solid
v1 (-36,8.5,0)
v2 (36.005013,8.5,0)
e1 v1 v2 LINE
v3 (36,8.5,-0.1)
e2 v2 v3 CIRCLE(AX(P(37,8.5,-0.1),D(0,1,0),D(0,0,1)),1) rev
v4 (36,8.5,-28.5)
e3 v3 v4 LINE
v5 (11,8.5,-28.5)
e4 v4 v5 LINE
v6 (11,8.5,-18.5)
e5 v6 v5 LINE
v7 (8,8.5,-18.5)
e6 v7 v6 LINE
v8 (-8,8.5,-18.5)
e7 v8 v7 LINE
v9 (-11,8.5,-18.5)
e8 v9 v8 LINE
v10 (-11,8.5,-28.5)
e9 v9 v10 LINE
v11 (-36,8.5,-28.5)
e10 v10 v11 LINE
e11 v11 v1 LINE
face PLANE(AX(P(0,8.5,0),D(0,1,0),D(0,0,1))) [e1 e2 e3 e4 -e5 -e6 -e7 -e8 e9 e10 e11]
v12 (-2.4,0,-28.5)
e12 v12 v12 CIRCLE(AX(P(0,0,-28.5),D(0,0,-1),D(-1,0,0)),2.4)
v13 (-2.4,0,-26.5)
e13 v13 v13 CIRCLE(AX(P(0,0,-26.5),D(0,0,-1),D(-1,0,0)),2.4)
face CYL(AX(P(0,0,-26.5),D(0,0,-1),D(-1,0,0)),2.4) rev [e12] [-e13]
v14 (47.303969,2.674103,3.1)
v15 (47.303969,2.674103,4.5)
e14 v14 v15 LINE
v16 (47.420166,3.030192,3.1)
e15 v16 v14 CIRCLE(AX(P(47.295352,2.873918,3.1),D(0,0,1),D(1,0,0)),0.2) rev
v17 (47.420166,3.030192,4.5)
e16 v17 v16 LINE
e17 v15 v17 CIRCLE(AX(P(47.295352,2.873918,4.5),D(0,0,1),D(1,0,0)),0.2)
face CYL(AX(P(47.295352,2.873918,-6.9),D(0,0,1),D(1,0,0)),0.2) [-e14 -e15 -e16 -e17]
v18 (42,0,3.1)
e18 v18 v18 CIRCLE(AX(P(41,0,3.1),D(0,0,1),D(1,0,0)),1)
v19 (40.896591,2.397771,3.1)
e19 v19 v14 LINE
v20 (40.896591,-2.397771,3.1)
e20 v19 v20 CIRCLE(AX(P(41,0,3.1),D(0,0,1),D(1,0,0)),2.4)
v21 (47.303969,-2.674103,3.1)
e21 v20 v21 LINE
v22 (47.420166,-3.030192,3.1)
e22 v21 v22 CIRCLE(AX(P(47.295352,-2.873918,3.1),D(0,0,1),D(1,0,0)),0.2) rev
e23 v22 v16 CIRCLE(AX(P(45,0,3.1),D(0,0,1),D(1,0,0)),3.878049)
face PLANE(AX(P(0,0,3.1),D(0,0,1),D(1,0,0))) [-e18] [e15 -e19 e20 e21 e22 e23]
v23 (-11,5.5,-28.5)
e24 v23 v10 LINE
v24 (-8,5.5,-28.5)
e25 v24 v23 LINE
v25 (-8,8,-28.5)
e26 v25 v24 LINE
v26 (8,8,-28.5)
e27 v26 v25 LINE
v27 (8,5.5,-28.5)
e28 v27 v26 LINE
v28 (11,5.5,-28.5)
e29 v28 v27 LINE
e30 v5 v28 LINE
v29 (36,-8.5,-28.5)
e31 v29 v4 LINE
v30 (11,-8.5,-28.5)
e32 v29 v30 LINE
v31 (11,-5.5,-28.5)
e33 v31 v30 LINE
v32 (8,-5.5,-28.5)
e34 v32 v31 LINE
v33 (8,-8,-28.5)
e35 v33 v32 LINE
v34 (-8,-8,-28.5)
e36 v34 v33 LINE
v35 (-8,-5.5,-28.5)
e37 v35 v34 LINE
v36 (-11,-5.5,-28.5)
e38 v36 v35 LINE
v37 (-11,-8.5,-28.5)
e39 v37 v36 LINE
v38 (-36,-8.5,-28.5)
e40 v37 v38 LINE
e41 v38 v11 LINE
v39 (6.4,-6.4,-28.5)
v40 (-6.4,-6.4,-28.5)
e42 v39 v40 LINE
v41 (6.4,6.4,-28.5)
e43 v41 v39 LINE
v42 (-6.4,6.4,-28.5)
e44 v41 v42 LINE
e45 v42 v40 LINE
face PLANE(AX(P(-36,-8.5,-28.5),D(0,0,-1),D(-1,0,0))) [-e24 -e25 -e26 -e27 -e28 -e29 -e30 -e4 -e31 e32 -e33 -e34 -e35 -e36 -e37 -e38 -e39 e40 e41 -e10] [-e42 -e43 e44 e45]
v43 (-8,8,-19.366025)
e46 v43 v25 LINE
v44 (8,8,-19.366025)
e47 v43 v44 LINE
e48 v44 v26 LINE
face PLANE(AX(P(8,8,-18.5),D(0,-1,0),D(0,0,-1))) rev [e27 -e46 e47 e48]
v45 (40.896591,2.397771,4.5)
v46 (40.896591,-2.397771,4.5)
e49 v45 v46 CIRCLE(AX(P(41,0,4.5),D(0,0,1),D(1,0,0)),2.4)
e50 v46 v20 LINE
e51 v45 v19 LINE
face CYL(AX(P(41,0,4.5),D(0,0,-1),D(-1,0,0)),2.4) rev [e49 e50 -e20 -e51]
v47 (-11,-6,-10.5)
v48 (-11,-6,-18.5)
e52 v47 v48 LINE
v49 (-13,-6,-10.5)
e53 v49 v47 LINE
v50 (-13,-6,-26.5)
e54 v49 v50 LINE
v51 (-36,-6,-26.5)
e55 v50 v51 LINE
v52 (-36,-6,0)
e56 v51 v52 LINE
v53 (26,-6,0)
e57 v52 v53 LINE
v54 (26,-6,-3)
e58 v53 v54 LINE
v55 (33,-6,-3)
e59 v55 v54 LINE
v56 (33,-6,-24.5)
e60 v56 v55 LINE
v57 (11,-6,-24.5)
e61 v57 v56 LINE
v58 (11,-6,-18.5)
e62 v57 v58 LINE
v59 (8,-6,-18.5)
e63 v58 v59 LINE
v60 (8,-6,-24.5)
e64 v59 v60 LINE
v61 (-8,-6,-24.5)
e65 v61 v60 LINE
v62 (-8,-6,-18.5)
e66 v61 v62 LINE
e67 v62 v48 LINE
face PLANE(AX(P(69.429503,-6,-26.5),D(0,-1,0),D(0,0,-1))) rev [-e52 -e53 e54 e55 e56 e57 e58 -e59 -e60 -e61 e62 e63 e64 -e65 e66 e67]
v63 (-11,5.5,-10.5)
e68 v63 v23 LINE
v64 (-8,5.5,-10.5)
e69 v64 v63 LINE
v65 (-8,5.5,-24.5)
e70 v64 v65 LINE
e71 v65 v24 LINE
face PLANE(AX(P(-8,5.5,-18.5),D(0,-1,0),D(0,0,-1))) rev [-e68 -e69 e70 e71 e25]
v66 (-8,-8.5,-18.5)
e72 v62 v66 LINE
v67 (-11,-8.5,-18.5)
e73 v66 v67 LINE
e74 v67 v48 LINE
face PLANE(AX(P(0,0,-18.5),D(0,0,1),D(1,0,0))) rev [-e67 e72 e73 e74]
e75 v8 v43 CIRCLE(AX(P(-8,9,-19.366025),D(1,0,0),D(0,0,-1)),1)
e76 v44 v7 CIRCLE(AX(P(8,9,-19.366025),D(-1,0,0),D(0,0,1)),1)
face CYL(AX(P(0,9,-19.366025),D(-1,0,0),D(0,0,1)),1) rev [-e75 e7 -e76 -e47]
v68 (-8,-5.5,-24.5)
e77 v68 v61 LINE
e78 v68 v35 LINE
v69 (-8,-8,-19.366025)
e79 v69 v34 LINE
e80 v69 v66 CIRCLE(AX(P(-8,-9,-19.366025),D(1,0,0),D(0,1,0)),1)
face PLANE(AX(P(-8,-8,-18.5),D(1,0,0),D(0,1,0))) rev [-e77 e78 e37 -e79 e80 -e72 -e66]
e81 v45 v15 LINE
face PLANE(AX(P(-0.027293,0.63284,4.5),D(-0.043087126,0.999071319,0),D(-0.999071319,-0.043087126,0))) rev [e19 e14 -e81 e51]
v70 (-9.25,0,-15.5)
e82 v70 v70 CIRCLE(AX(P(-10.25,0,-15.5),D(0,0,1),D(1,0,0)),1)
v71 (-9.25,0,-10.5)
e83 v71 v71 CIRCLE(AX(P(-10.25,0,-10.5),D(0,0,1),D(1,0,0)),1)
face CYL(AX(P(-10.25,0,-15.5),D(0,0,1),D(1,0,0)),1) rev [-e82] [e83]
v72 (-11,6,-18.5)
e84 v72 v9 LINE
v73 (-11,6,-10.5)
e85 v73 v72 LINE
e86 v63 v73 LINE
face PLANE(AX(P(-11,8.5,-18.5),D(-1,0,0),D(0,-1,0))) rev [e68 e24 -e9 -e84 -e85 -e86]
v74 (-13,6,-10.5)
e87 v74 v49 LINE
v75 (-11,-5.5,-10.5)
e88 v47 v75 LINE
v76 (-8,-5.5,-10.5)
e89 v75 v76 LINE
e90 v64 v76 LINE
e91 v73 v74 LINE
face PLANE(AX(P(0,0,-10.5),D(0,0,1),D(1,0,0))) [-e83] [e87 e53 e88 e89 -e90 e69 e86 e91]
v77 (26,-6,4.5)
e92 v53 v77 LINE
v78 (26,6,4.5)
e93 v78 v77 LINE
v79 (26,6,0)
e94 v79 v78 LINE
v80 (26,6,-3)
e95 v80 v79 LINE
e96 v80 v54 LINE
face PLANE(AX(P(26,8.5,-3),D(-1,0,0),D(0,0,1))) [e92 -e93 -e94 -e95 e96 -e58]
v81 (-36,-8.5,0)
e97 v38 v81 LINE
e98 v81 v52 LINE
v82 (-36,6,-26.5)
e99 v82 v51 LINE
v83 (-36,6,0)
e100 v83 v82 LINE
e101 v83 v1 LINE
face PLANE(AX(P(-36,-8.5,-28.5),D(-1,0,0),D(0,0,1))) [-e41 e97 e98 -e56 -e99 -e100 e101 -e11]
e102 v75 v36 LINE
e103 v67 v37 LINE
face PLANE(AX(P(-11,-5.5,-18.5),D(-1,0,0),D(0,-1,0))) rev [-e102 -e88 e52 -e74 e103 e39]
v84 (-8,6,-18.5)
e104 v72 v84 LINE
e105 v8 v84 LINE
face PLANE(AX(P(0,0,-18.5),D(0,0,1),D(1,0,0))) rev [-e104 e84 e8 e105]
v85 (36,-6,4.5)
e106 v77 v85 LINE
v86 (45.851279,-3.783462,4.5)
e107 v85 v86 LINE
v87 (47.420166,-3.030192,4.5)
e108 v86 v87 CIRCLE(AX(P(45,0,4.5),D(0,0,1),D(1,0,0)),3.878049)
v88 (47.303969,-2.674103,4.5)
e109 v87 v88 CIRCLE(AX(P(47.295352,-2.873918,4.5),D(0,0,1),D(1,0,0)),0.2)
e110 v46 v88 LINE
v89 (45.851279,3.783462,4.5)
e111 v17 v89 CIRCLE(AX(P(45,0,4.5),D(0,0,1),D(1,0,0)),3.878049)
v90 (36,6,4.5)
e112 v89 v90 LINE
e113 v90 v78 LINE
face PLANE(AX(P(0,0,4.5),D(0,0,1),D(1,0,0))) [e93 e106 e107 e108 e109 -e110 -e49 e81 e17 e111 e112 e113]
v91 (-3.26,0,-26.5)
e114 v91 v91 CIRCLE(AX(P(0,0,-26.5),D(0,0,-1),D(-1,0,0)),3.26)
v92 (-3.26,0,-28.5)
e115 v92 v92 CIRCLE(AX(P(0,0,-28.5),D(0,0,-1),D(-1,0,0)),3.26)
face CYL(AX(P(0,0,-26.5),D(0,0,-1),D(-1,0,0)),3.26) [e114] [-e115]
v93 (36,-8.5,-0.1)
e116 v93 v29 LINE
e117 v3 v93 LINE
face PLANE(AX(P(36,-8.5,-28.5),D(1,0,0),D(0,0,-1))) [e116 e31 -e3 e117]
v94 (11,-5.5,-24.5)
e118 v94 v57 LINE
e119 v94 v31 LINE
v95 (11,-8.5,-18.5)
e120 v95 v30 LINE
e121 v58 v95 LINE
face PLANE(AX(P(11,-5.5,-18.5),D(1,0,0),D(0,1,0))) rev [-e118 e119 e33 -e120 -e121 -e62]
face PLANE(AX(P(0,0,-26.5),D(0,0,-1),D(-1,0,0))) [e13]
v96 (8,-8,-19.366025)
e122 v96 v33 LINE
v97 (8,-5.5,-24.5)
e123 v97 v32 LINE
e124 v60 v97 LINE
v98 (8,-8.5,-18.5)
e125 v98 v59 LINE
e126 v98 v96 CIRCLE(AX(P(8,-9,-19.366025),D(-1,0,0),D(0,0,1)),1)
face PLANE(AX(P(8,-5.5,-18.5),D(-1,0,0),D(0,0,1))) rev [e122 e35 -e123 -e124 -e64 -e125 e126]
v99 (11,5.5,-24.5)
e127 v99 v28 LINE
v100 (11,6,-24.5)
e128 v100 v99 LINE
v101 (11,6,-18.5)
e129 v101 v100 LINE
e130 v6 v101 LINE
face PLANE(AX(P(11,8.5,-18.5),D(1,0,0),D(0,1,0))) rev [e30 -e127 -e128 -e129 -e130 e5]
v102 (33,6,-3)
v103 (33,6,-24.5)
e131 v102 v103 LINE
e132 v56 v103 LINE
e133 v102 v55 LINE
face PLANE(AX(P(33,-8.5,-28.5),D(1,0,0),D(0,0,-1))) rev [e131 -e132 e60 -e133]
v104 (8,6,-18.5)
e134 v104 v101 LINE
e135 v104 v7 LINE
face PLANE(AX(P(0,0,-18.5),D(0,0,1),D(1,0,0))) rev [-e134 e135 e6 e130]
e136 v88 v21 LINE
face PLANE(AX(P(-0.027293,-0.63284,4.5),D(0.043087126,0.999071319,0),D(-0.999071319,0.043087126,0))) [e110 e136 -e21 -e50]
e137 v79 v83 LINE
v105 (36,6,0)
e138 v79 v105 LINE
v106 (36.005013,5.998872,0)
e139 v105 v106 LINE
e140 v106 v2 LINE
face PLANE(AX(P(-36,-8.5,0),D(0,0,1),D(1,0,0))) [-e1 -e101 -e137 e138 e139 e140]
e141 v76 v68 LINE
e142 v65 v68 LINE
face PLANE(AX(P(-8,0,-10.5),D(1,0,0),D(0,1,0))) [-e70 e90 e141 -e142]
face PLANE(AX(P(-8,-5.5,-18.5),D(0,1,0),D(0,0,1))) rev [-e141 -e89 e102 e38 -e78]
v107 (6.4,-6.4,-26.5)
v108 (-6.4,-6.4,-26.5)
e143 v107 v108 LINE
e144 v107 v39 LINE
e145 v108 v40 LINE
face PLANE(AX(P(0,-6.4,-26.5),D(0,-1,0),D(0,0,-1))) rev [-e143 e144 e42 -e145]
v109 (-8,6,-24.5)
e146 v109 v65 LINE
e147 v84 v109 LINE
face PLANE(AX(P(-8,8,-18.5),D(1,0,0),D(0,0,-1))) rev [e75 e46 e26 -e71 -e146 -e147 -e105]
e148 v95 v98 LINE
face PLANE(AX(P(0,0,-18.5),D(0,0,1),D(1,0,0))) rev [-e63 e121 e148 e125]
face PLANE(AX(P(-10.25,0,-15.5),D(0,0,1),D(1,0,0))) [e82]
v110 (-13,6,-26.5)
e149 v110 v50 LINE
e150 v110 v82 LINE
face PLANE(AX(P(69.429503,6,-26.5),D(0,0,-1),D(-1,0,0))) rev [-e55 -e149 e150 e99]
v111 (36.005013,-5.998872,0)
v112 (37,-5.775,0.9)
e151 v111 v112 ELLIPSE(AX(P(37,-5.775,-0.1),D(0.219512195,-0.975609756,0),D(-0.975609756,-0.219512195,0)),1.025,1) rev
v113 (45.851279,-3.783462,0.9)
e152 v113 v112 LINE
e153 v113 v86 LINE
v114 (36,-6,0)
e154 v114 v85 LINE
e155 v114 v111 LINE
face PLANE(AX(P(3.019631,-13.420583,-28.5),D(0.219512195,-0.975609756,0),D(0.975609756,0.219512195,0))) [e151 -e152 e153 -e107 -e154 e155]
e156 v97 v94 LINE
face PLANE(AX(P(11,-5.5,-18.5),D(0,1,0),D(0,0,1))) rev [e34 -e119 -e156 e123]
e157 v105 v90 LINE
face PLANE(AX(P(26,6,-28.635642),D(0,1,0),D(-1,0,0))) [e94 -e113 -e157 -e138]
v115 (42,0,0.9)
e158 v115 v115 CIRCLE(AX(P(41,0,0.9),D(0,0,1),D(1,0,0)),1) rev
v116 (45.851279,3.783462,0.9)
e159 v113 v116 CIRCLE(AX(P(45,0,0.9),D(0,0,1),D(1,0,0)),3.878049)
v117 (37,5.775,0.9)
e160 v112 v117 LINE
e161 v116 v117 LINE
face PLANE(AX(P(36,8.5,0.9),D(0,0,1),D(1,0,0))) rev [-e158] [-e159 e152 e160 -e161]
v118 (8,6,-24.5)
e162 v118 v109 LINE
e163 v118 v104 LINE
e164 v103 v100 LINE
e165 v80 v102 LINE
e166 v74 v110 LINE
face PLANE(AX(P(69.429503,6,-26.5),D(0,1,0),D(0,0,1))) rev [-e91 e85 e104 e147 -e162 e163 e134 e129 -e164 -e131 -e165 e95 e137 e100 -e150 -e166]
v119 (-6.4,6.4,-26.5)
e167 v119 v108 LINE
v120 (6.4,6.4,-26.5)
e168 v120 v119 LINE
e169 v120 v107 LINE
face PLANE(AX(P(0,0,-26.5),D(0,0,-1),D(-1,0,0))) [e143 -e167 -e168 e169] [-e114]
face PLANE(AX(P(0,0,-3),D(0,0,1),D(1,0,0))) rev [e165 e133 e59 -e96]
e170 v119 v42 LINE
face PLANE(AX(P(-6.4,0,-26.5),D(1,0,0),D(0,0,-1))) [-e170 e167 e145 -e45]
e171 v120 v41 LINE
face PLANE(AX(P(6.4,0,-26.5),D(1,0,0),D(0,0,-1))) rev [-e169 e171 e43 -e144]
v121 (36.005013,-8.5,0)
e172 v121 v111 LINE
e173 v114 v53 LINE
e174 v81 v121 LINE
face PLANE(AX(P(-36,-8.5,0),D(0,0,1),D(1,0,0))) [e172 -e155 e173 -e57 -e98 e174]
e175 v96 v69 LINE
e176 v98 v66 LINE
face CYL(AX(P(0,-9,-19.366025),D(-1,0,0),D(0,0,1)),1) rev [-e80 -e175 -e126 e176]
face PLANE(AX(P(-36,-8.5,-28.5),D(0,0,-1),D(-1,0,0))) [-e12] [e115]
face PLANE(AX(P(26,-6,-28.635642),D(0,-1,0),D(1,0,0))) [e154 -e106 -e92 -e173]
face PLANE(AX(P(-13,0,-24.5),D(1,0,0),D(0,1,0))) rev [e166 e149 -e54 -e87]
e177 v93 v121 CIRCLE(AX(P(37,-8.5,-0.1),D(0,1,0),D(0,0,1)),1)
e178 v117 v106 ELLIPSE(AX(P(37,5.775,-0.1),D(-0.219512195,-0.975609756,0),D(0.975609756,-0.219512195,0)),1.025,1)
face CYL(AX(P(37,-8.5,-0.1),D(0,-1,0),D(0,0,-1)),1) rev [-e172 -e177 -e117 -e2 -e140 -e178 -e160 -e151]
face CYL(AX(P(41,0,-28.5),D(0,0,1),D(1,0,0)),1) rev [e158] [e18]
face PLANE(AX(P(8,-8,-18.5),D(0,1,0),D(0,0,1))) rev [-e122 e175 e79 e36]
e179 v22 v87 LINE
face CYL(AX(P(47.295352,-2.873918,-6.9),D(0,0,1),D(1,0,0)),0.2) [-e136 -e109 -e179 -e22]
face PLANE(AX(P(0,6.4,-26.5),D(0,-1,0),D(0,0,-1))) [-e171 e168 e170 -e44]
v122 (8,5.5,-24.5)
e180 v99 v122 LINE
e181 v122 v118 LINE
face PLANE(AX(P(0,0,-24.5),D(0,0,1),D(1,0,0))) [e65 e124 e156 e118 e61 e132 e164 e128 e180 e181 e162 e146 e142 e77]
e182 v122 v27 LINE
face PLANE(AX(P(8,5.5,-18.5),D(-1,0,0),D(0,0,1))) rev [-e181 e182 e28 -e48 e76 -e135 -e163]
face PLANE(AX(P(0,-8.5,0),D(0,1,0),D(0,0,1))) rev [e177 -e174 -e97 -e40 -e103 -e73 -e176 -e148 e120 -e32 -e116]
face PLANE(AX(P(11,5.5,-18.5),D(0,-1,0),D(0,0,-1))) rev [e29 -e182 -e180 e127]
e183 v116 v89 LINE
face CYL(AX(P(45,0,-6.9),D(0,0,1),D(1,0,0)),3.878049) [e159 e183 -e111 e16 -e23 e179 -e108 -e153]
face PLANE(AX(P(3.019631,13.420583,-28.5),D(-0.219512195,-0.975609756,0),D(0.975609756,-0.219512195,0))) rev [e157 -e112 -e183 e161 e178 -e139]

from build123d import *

# Parameters (mm, degrees)
BOSS_EXTRUDE1_DEPTH      = 8.5
BOSS_EXTRUDE1_DEPTH_BACK = 8.5
SKETCH1_W                = 72
SKETCH1_H                = 28.5
SKETCH2_W                = 31.201469113
SKETCH2_H                = 12
CUT_EXTRUDE1_DEPTH       = 69
SKETCH3_W                = 10
SKETCH3_H                = 17
BOSS_EXTRUDE2_DEPTH      = 3
CUT_EXTRUDE2_DEPTH       = 10
FILLET1_R                = 1
BOSS_EXTRUDE3_DEPTH      = 2
SKETCH8_W                = 12.8
SKETCH8_H                = 12.8
SKETCH8_R                = 3.26
SKETCH8_R_2              = 2.4
CUT_EXTRUDE3_DEPTH       = 2
SKETCH11_W               = 26
SKETCH11_H               = 12
BOSS_EXTRUDE7_DEPTH      = 3.1
SKETCH14_R               = 1
CUT_EXTRUDE4_DEPTH       = 62.43948242
CUT_EXTRUDE6_DEPTH       = 62.43948242
CUT_EXTRUDE7_DEPTH       = 62.43948242
BOSS_EXTRUDE8_DEPTH      = 14
SKETCH19_R               = 1
CUT_EXTRUDE8_DEPTH       = 5
SKETCH20_W               = 17.87603411
SKETCH20_H               = 5.867107887
CUT_EXTRUDE9_DEPTH       = 62.686708455
FILLET4_R                = 1
CUT_EXTRUDE10_DEPTH      = 10
BOSS_EXTRUDE9_START      = 1.4
BOSS_EXTRUDE9_DEPTH      = 1.4
FILLET5_R                = 0.2


with BuildPart() as part:
    # Sketch1 → Boss-Extrude1 (new, two sides: drawn at the far end of the back side and taken through both)
    with BuildSketch(Plane(origin=(0, 0, 0), x_dir=(1, 0, 0), z_dir=(0, 1, 0)).offset(-BOSS_EXTRUDE1_DEPTH_BACK)):
        with Locations((0, 14.25)):
            Rectangle(SKETCH1_W, SKETCH1_H)
    extrude(amount=BOSS_EXTRUDE1_DEPTH + BOSS_EXTRUDE1_DEPTH_BACK)

    # Sketch2 → Cut-Extrude1 (cut)
    with BuildSketch(Plane.ZY.offset(36)):
        with Locations((-10.899265443, 0)):
            Rectangle(SKETCH2_W, SKETCH2_H)
    extrude(amount=-CUT_EXTRUDE1_DEPTH, mode=Mode.SUBTRACT)

    # Sketch3 → Boss-Extrude2 (add)
    with BuildSketch(Plane.XY):
        with Locations((31, 0)):
            Rectangle(SKETCH3_W, SKETCH3_H)
    extrude(amount=-BOSS_EXTRUDE2_DEPTH)

    # Sketch6 → Cut-Extrude2 (cut)
    with BuildSketch(Plane(origin=(0, 0, -28.5), x_dir=(-1, 0, 0), z_dir=(0, 0, -1))):
        Polygon((-11, 8.5), (-11, 5.5), (-8, 5.5), (-8, 8), (8, 8), (8, 5.5), (11, 5.5), (11, 8.5), align=None)
        Polygon((-11, -5.5), (-11, -8.5), (11, -8.5), (11, -5.5), (8, -5.5), (8, -8), (-8, -8), (-8, -5.5), align=None)
    extrude(amount=-CUT_EXTRUDE2_DEPTH, mode=Mode.SUBTRACT)

    # Fillet1
    # the kernel refuses this fillet: 1 mm, written as the material it adds along each edge
    with BuildSketch(Plane(origin=(-8, -8, -18.5), x_dir=(0, 0, -1), z_dir=(1, 0, 0)), Plane(origin=(8, 8, -18.5), x_dir=(0, 0, -1), z_dir=(-1, 0, 0))) as fillet1_piece_1:
        with BuildLine():
            CenterArc((0.866025404, -1), FILLET1_R, 90, 60)
            Line((0, -0.5), (-0.017320508, -0.49))
            ThreePointArc((-0.017320508, -0.49), (-0.02, -0.25), (-0.02, 0))
            Line((-0.02, 0), (0, 0.02))
            Line((0, 0.02), (0.866025404, 0.02))
            Line((0.866025404, 0.02), (0.866025404, 0))
        make_face()
    extrude(amount=16)

    # Sketch7 → Boss-Extrude3 (add)
    with BuildSketch(Plane.XY.offset(-26.5)):
        Polygon((33, -6), (33, 6), (11, 6), (11, 5.5), (8, 5.5), (8, 6), (-8, 6), (-8, 5.5), (-11, 5.5), (-11, 6), (-13, 6), (-13, -6), (-11, -6), (-11, -5.5), (-8, -5.5), (-8, -6), (8, -6), (8, -5.5), (11, -5.5), (11, -6), align=None)
    extrude(amount=BOSS_EXTRUDE3_DEPTH)

    # Sketch8 → Cut-Extrude3 (cut)
    # profile 1 of 2: a face of its own
    with BuildSketch(Plane(origin=(0, 0, -28.5), x_dir=(-1, 0, 0), z_dir=(0, 0, -1))):
        Rectangle(SKETCH8_W, SKETCH8_H)
        Circle(SKETCH8_R, mode=Mode.SUBTRACT)
    # profile 2 of 2: a face of its own
    with BuildSketch(Plane(origin=(0, 0, -28.5), x_dir=(-1, 0, 0), z_dir=(0, 0, -1))):
        Circle(SKETCH8_R_2)
    extrude(amount=-CUT_EXTRUDE3_DEPTH, mode=Mode.SUBTRACT)

    # Sketch11 → Boss-Extrude7 (add)
    with BuildSketch(Plane.XY.offset(3.1)):
        with Locations((39, 0)):
            Rectangle(SKETCH11_W, SKETCH11_H)
    extrude(amount=-BOSS_EXTRUDE7_DEPTH)

    # Sketch14 → Cut-Extrude4 (cut, through all)
    with BuildSketch(Plane.XY.offset(3.1)):
        with Locations((41, 0)):
            Circle(SKETCH14_R)
    extrude(amount=-CUT_EXTRUDE4_DEPTH, mode=Mode.SUBTRACT)

    # Sketch15 → Cut-Extrude6 (cut, through all)
    with BuildSketch(Plane.XY.offset(3.1)):
        with BuildLine():
            Line((52, 6), (36, 6))
            Line((36, 6), (49.658536622, 2.92682926))
            ThreePointArc((49.658536622, 2.92682926), (51.34260644, 1.874085128), (52, 0))
            Line((52, 0), (52, 6))
        make_face()
    extrude(amount=-CUT_EXTRUDE6_DEPTH, mode=Mode.SUBTRACT)

    # Sketch17 → Cut-Extrude7 (cut, through all)
    with BuildSketch(Plane.XY.offset(3.1)):
        with BuildLine():
            Line((36, -6), (52, -6))
            Line((52, -6), (52, 0))
            ThreePointArc((52, 0), (51.342606414, -1.874085161), (49.658536541, -2.926829278))
            Line((49.658536541, -2.926829278), (36, -6))
        make_face()
    extrude(amount=-CUT_EXTRUDE7_DEPTH, mode=Mode.SUBTRACT)

    # Sketch18 → Boss-Extrude8 (add)
    with BuildSketch(Plane.XY.offset(-24.5)):
        Polygon((-11, 6), (-13, 6), (-13, -6), (-11, -6), (-11, -5.5), (-8, -5.5), (-8, 5.5), (-11, 5.5), align=None)
    extrude(amount=BOSS_EXTRUDE8_DEPTH)

    # Sketch19 → Cut-Extrude8 (cut)
    with BuildSketch(Plane.XY.offset(-10.5)):
        with Locations((-10.25, 0)):
            Circle(SKETCH19_R)
    extrude(amount=-CUT_EXTRUDE8_DEPTH, mode=Mode.SUBTRACT)

    # Sketch20 → Cut-Extrude9 (cut, through all)
    with BuildSketch(Plane.XZ.offset(8.5)):
        with Locations((44.938017055, -2.033553943)):
            Rectangle(SKETCH20_W, SKETCH20_H)
    extrude(amount=-CUT_EXTRUDE9_DEPTH, mode=Mode.SUBTRACT)

    # Fillet4
    # the kernel refuses this fillet: 1 mm, written as the material it adds along each edge
    with BuildSketch(Plane(origin=(36, -8.5, 0.9), x_dir=(1, 0, 0), z_dir=(0, 1, 0))) as fillet4_piece_1_section:
        with BuildLine():
            CenterArc((FILLET4_R, FILLET4_R), FILLET4_R, 180, 90)
            Line((0, FILLET4_R), (0, 0))
            Line((0, 0), (FILLET4_R, 0))
        make_face()
    fillet4_piece_1 = extrude(amount=14.5, mode=Mode.PRIVATE)
    fillet4_piece_1 = split(fillet4_piece_1, bisect_by=Plane(origin=(35.990889593, -7.251037957, 0), z_dir=(0, 0, -1)), keep=Keep.TOP, mode=Mode.PRIVATE)
    fillet4_piece_1 = split(fillet4_piece_1, bisect_by=Plane(origin=(35.723408497, -6.062233088, -0.048071683), z_dir=(0.21951219512195128, -0.9756097560975611, 0)), keep=Keep.TOP, mode=Mode.PRIVATE)
    fillet4_piece_1 = split(fillet4_piece_1, bisect_by=Plane(origin=(35.990889593, -6, -0.048071683), z_dir=(0, -1, 0)), keep=Keep.TOP, mode=Mode.PRIVATE)
    add(fillet4_piece_1)
    with BuildSketch(Plane(origin=(36, -6, 0.9), x_dir=(1, 0, 0), z_dir=(0, 1, 0))) as fillet4_piece_2_section:
        with BuildLine():
            CenterArc((FILLET4_R, FILLET4_R), FILLET4_R, 180, 90)
            Line((0, FILLET4_R), (0, 0))
            Line((0, 0), (FILLET4_R, 0))
        make_face()
    fillet4_piece_2 = extrude(amount=12, mode=Mode.PRIVATE)
    fillet4_piece_2 = split(fillet4_piece_2, bisect_by=Plane(origin=(36.226665296, 0, 0), z_dir=(0, 0, 1)), keep=Keep.TOP, mode=Mode.PRIVATE)
    fillet4_piece_2 = split(fillet4_piece_2, bisect_by=Plane(origin=(37.500692727, 5.662344136, 0.678804193), z_dir=(-0.2195121951219508, -0.9756097560975612, 0)), keep=Keep.TOP, mode=Mode.PRIVATE)
    fillet4_piece_2 = split(fillet4_piece_2, bisect_by=Plane(origin=(37.500692727, -5.662344136, 0.678804193), z_dir=(-0.21951219512195128, 0.9756097560975611, 0)), keep=Keep.TOP, mode=Mode.PRIVATE)
    add(fillet4_piece_2)
    with BuildSketch(Plane(origin=(36, -6, 0.9), x_dir=(1, 0, 0), z_dir=(0, 1, 0))) as fillet4_piece_3_section:
        with BuildLine():
            CenterArc((FILLET4_R, FILLET4_R), FILLET4_R, 180, 90)
            Line((0, FILLET4_R), (0, 0))
            Line((0, 0), (FILLET4_R, 0))
        make_face()
    fillet4_piece_3 = extrude(amount=12, mode=Mode.PRIVATE)
    fillet4_piece_3 = split(fillet4_piece_3, bisect_by=Plane(origin=(35.990886035, 0, 0), z_dir=(0, 0, -1)), keep=Keep.TOP, mode=Mode.PRIVATE)
    add(fillet4_piece_3)
    with BuildSketch(Plane(origin=(36, -6, 0.9), x_dir=(1, 0, 0), z_dir=(0, 1, 0))) as fillet4_piece_4_section:
        with BuildLine():
            CenterArc((FILLET4_R, FILLET4_R), FILLET4_R, 180, 90)
            Line((0, FILLET4_R), (0, 0))
            Line((0, 0), (FILLET4_R, 0))
        make_face()
    fillet4_piece_4 = extrude(amount=14.5, mode=Mode.PRIVATE)
    fillet4_piece_4 = split(fillet4_piece_4, bisect_by=Plane(origin=(35.990889593, 7.251037957, 0), z_dir=(0, 0, -1)), keep=Keep.TOP, mode=Mode.PRIVATE)
    fillet4_piece_4 = split(fillet4_piece_4, bisect_by=Plane(origin=(35.990889593, 6, -0.048071683), z_dir=(0, 1, 0)), keep=Keep.TOP, mode=Mode.PRIVATE)
    fillet4_piece_4 = split(fillet4_piece_4, bisect_by=Plane(origin=(35.723408497, 6.062233088, -0.048071683), z_dir=(0.2195121951219508, 0.9756097560975612, 0)), keep=Keep.TOP, mode=Mode.PRIVATE)
    add(fillet4_piece_4)

    # Sketch21 → Cut-Extrude10 (cut)
    with BuildSketch(Plane.XY.offset(3.1)):
        with BuildLine():
            ThreePointArc((48.87804878, 0), (48.028247344, -2.422597855), (45.851279032, -3.783462218))
            Line((45.851279032, -3.783462218), (49.658536585, -2.926829268))
            ThreePointArc((49.658536585, -2.926829268), (52, 0), (49.658536585, 2.926829268))
            Line((49.658536585, 2.926829268), (45.851279024, 3.78346222))
            ThreePointArc((45.851279024, 3.78346222), (48.028247342, 2.422597858), (48.87804878, 0))
        make_face()
    extrude(amount=-CUT_EXTRUDE10_DEPTH, mode=Mode.SUBTRACT)

    # Sketch23 → Boss-Extrude9 (add)
    with BuildSketch(Plane.XY.offset(3.1).offset(BOSS_EXTRUDE9_START)):
        with BuildLine():
            ThreePointArc((40.896590916, -2.397771165), (38.6, -8e-09), (40.896590899, 2.397771165))
            Line((40.896590899, 2.397771165), (47.78858717, 2.695003514))
            ThreePointArc((47.78858717, 2.695003514), (46.899563641, 3.380964406), (45.851279001, 3.783462225))
            Line((45.851279001, 3.783462225), (36, 6))
            Line((36, 6), (26, 6))
            Line((26, 6), (26, -6))
            Line((26, -6), (36, -6))
            Line((36, -6), (45.851279001, -3.783462225))
            ThreePointArc((45.851279001, -3.783462225), (46.899563641, -3.380964406), (47.78858717, -2.695003514))
            Line((47.78858717, -2.695003514), (40.896590916, -2.397771165))
        make_face()
    extrude(amount=-BOSS_EXTRUDE9_DEPTH)

    # Fillet5
    fillet5_edges = [part.edges().sort_by_distance(p)[0] for p in [
        (47.78858717, 2.695003514, 3.8),
        (47.78858717, -2.695003514, 3.8),
    ]]
    fillet(fillet5_edges, radius=FILLET5_R)


solid = part.part
